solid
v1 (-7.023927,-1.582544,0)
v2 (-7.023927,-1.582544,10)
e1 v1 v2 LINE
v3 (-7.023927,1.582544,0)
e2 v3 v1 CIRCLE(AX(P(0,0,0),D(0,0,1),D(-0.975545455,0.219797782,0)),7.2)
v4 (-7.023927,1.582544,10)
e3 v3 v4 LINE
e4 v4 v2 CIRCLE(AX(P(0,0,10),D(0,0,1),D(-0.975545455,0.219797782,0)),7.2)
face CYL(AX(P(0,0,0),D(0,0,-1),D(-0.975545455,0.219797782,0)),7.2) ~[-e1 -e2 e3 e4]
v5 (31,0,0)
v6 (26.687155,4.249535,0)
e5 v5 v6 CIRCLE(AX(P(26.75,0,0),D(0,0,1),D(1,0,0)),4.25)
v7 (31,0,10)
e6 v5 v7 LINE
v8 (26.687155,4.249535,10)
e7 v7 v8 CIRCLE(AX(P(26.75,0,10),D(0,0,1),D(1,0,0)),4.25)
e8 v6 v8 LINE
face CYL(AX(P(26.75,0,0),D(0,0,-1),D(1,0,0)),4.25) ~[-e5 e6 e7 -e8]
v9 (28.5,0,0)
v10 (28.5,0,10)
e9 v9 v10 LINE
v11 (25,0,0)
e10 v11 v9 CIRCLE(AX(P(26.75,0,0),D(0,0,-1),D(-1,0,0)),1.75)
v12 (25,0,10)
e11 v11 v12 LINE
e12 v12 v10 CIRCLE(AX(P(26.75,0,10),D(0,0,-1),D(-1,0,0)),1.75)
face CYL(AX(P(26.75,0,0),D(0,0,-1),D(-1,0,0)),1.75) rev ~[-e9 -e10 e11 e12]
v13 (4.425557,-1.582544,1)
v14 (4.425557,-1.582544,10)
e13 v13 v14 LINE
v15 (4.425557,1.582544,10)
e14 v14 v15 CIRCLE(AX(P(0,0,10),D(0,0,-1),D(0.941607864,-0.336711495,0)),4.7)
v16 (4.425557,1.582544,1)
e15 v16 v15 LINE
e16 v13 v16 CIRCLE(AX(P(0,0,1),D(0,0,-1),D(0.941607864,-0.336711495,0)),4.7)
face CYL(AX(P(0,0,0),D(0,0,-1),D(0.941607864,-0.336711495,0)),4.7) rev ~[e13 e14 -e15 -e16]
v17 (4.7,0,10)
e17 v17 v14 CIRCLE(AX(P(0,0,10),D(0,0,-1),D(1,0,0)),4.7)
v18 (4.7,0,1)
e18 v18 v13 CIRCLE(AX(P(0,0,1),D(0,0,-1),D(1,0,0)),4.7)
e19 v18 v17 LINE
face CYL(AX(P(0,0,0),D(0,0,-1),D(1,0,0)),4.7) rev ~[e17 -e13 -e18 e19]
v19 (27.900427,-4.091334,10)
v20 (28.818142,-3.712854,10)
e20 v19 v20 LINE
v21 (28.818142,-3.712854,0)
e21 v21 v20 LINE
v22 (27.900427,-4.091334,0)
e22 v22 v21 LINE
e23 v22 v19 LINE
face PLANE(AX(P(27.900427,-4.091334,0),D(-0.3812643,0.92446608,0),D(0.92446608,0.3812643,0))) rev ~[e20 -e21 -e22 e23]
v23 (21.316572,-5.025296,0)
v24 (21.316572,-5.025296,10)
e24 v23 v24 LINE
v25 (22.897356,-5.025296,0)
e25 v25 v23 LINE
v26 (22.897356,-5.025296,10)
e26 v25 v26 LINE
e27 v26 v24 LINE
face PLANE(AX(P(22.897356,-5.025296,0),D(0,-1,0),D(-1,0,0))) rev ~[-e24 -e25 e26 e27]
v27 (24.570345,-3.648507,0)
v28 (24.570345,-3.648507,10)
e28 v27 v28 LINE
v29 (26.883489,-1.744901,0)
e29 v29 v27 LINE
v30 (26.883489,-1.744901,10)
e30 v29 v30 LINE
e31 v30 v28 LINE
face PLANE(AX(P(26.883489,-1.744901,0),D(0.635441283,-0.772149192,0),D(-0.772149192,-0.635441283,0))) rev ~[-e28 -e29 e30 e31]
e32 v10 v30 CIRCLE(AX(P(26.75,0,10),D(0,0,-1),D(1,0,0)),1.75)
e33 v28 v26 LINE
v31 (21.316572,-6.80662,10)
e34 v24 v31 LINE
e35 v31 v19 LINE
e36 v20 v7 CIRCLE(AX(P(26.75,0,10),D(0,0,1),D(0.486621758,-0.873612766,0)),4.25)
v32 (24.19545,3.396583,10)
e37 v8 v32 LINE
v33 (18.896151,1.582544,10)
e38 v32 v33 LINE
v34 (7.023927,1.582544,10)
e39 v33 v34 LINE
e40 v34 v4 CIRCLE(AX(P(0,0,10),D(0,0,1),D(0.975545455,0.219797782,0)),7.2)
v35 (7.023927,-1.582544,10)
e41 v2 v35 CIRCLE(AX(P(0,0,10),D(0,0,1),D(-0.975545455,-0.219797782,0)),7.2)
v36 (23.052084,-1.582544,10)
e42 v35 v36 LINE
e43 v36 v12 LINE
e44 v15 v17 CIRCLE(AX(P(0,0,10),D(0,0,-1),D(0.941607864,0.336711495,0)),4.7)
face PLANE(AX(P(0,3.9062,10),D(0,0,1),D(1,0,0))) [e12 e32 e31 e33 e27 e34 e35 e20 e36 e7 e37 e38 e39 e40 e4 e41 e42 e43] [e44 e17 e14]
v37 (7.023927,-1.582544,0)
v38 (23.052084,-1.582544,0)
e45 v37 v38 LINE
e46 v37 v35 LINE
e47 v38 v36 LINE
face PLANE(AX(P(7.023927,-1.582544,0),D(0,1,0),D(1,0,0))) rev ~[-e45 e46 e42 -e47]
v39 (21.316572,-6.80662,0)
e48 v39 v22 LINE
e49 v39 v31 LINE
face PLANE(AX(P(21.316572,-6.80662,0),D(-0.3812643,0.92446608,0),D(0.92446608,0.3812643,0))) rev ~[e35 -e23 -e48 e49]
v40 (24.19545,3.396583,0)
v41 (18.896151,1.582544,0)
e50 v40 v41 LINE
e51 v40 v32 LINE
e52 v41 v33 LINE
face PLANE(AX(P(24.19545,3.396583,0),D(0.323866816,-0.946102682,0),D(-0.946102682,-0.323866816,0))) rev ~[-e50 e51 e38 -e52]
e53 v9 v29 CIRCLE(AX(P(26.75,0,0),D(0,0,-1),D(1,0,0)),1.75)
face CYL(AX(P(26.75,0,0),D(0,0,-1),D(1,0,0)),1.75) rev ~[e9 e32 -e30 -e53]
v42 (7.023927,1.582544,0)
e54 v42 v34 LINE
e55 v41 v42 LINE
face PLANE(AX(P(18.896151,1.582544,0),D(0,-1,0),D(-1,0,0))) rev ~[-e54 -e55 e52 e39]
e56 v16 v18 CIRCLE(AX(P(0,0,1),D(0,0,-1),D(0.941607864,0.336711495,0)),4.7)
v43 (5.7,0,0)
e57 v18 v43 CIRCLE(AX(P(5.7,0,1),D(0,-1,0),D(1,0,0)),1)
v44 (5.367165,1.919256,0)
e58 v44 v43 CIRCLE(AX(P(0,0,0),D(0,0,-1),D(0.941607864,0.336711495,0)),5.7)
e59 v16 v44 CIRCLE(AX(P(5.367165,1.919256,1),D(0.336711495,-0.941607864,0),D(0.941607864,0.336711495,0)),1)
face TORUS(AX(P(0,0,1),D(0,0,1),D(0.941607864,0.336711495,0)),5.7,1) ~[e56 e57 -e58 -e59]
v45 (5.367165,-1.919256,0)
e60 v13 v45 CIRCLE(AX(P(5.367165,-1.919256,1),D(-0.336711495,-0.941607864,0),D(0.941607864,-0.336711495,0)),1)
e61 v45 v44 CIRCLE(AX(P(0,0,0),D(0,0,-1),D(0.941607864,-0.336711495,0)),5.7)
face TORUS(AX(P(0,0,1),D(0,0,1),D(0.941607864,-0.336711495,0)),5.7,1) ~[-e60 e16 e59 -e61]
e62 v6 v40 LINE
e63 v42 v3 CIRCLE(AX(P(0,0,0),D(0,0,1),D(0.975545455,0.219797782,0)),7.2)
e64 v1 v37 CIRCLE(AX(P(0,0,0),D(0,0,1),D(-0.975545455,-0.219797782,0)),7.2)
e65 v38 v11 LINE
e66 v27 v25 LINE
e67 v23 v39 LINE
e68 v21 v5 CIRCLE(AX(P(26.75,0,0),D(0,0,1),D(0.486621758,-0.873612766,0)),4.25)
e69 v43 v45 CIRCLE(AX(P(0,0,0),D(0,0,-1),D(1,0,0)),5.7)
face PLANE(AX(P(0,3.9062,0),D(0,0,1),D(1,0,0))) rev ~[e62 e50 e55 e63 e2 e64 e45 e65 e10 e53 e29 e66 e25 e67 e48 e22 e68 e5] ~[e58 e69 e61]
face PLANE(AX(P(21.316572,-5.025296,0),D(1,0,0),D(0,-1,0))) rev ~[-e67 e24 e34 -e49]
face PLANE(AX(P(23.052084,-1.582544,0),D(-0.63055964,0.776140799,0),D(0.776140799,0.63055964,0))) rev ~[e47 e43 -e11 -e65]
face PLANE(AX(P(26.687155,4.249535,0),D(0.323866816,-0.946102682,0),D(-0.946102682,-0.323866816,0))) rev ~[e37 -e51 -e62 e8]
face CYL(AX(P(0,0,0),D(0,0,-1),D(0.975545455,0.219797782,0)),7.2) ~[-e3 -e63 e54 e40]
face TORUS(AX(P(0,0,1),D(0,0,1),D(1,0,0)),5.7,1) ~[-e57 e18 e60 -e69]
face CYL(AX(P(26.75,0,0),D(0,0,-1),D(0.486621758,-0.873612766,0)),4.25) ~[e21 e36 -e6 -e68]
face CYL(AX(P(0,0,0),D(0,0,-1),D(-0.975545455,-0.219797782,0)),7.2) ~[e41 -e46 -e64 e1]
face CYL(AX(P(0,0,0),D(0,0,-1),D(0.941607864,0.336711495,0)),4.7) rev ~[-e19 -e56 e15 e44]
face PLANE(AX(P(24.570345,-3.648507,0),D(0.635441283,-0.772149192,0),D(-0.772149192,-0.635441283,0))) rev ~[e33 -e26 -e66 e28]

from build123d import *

# Parameters (mm, degrees)
F1_DEPTH = 10
F2_R     = 1


# Not quite as in the source:
# - a feature names something its author has since deleted; it is built from what else it names


with BuildPart() as f1:
    # F0 (on Top) → F1 (new body)
    with BuildSketch(Plane.XY):
        with BuildLine():
            ThreePointArc((-4.4255569592, 1.5825440281), (0, 4.7), (4.4255569592, 1.5825440281))
            Line((4.4255569592, 1.5825440281), (7.0239272775, 1.5825440281))
            ThreePointArc((7.0239272775, 1.5825440281), (0, 7.2), (-7.0239272775, 1.5825440281))
            Line((-7.0239272775, 1.5825440281), (-4.4255569592, 1.5825440281))
        make_face()
        with BuildLine():
            ThreePointArc((-4.4255569592, -1.5825440281), (-4.7, 0), (-4.4255569592, 1.5825440281))
            Line((-4.4255569592, 1.5825440281), (-7.0239272775, 1.5825440281))
            ThreePointArc((-7.0239272775, 1.5825440281), (-7.2, 0), (-7.0239272775, -1.5825440281))
            Line((-7.0239272775, -1.5825440281), (-4.4255569592, -1.5825440281))
        make_face()
        with BuildLine():
            Line((7.0239272775, -1.5825440281), (4.4255569592, -1.5825440281))
            ThreePointArc((4.4255569592, -1.5825440281), (0, -4.7), (-4.4255569592, -1.5825440281))
            Line((-4.4255569592, -1.5825440281), (-7.0239272775, -1.5825440281))
            ThreePointArc((-7.0239272775, -1.5825440281), (0, -7.2), (7.0239272775, -1.5825440281))
        make_face()
        with BuildLine():
            ThreePointArc((4.4255569592, 1.5825440281), (4.6308810019, 0.8030822784), (4.7, 0))
            ThreePointArc((4.7, 0), (4.6308810019, -0.8030822784), (4.4255569592, -1.5825440281))
            Line((4.4255569592, -1.5825440281), (7.0239272775, -1.5825440281))
            ThreePointArc((7.0239272775, -1.5825440281), (7.1558464348, -0.7961543827), (7.2, 0))
            ThreePointArc((7.2, 0), (7.1558464348, 0.7961543827), (7.0239272775, 1.5825440281))
            Line((7.0239272775, 1.5825440281), (4.4255569592, 1.5825440281))
        make_face()
        with BuildLine():
            ThreePointArc((24.1954502469, 3.3965829239), (23.3763263872, 2.5847294548), (22.8056300377, 1.5825440281))
            Line((22.8056300377, 1.5825440281), (25, 1.5825440281))
            Line((25, 1.5825440281), (25, 0))
            ThreePointArc((25, 0), (26.75, 1.75), (28.5, 0))
            ThreePointArc((28.5, 0), (28.0337651782, -1.1893052456), (26.8834891802, -1.7449013264))
            Line((26.8834891802, -1.7449013264), (24.5703446749, -3.6485069089))
            ThreePointArc((24.5703446749, -3.6485069089), (26.1897753497, -4.2129144711), (27.9004272408, -4.0913343989))
            Line((27.9004272408, -4.0913343989), (28.8181424703, -3.7128542555))
            ThreePointArc((28.8181424703, -3.7128542555), (30.41415785, -2.1532411037), (31, 0))
            ThreePointArc((31, 0), (29.7329020897, 3.0273412631), (26.6871552362, 4.2495353317))
            Line((26.6871552362, 4.2495353317), (24.1954502469, 3.3965829239))
        make_face()
        with BuildLine():
            ThreePointArc((22.8056300377, 1.5825440281), (22.5, 0), (22.8056300377, -1.5825440281))
            Line((22.8056300377, -1.5825440281), (23.0520843585, -1.5825440281))
            Line((23.0520843585, -1.5825440281), (25, 0))
            Line((25, 0), (25, 1.5825440281))
            Line((25, 1.5825440281), (22.8056300377, 1.5825440281))
        make_face()
        with BuildLine():
            Line((18.896151334, 1.5825440281), (7.0239272775, 1.5825440281))
            ThreePointArc((7.0239272775, 1.5825440281), (7.1558464348, 0.7961543827), (7.2, 0))
            ThreePointArc((7.2, 0), (7.1558464348, -0.7961543827), (7.0239272775, -1.5825440281))
            Line((7.0239272775, -1.5825440281), (22.8056300377, -1.5825440281))
            ThreePointArc((22.8056300377, -1.5825440281), (22.5, 0), (22.8056300377, 1.5825440281))
            Line((22.8056300377, 1.5825440281), (18.896151334, 1.5825440281))
        make_face()
        with BuildLine():
            Line((24.1954502469, 3.3965829239), (18.896151334, 1.5825440281))
            Line((18.896151334, 1.5825440281), (22.8056300377, 1.5825440281))
            ThreePointArc((22.8056300377, 1.5825440281), (23.3763263872, 2.5847294548), (24.1954502469, 3.3965829239))
        make_face()
        with BuildLine():
            ThreePointArc((27.9004272408, -4.0913343989), (26.1897753497, -4.2129144711), (24.5703446749, -3.6485069089))
            Line((24.5703446749, -3.6485069089), (22.897355554, -5.0252957012))
            Line((22.897355554, -5.0252957012), (21.3165715317, -5.0252957012))
            Line((21.3165715317, -5.0252957012), (21.3165715317, -6.8066196779))
            Line((21.3165715317, -6.8066196779), (27.9004272408, -4.0913343989))
        make_face()
    extrude(amount=F1_DEPTH)

    # F2
    f2_edges = [f1.edges().sort_by_distance(p)[0] for p in [
        (-4.425557, -1.582544, 0),
    ]]
    fillet(f2_edges, radius=F2_R)


solid = f1.part
